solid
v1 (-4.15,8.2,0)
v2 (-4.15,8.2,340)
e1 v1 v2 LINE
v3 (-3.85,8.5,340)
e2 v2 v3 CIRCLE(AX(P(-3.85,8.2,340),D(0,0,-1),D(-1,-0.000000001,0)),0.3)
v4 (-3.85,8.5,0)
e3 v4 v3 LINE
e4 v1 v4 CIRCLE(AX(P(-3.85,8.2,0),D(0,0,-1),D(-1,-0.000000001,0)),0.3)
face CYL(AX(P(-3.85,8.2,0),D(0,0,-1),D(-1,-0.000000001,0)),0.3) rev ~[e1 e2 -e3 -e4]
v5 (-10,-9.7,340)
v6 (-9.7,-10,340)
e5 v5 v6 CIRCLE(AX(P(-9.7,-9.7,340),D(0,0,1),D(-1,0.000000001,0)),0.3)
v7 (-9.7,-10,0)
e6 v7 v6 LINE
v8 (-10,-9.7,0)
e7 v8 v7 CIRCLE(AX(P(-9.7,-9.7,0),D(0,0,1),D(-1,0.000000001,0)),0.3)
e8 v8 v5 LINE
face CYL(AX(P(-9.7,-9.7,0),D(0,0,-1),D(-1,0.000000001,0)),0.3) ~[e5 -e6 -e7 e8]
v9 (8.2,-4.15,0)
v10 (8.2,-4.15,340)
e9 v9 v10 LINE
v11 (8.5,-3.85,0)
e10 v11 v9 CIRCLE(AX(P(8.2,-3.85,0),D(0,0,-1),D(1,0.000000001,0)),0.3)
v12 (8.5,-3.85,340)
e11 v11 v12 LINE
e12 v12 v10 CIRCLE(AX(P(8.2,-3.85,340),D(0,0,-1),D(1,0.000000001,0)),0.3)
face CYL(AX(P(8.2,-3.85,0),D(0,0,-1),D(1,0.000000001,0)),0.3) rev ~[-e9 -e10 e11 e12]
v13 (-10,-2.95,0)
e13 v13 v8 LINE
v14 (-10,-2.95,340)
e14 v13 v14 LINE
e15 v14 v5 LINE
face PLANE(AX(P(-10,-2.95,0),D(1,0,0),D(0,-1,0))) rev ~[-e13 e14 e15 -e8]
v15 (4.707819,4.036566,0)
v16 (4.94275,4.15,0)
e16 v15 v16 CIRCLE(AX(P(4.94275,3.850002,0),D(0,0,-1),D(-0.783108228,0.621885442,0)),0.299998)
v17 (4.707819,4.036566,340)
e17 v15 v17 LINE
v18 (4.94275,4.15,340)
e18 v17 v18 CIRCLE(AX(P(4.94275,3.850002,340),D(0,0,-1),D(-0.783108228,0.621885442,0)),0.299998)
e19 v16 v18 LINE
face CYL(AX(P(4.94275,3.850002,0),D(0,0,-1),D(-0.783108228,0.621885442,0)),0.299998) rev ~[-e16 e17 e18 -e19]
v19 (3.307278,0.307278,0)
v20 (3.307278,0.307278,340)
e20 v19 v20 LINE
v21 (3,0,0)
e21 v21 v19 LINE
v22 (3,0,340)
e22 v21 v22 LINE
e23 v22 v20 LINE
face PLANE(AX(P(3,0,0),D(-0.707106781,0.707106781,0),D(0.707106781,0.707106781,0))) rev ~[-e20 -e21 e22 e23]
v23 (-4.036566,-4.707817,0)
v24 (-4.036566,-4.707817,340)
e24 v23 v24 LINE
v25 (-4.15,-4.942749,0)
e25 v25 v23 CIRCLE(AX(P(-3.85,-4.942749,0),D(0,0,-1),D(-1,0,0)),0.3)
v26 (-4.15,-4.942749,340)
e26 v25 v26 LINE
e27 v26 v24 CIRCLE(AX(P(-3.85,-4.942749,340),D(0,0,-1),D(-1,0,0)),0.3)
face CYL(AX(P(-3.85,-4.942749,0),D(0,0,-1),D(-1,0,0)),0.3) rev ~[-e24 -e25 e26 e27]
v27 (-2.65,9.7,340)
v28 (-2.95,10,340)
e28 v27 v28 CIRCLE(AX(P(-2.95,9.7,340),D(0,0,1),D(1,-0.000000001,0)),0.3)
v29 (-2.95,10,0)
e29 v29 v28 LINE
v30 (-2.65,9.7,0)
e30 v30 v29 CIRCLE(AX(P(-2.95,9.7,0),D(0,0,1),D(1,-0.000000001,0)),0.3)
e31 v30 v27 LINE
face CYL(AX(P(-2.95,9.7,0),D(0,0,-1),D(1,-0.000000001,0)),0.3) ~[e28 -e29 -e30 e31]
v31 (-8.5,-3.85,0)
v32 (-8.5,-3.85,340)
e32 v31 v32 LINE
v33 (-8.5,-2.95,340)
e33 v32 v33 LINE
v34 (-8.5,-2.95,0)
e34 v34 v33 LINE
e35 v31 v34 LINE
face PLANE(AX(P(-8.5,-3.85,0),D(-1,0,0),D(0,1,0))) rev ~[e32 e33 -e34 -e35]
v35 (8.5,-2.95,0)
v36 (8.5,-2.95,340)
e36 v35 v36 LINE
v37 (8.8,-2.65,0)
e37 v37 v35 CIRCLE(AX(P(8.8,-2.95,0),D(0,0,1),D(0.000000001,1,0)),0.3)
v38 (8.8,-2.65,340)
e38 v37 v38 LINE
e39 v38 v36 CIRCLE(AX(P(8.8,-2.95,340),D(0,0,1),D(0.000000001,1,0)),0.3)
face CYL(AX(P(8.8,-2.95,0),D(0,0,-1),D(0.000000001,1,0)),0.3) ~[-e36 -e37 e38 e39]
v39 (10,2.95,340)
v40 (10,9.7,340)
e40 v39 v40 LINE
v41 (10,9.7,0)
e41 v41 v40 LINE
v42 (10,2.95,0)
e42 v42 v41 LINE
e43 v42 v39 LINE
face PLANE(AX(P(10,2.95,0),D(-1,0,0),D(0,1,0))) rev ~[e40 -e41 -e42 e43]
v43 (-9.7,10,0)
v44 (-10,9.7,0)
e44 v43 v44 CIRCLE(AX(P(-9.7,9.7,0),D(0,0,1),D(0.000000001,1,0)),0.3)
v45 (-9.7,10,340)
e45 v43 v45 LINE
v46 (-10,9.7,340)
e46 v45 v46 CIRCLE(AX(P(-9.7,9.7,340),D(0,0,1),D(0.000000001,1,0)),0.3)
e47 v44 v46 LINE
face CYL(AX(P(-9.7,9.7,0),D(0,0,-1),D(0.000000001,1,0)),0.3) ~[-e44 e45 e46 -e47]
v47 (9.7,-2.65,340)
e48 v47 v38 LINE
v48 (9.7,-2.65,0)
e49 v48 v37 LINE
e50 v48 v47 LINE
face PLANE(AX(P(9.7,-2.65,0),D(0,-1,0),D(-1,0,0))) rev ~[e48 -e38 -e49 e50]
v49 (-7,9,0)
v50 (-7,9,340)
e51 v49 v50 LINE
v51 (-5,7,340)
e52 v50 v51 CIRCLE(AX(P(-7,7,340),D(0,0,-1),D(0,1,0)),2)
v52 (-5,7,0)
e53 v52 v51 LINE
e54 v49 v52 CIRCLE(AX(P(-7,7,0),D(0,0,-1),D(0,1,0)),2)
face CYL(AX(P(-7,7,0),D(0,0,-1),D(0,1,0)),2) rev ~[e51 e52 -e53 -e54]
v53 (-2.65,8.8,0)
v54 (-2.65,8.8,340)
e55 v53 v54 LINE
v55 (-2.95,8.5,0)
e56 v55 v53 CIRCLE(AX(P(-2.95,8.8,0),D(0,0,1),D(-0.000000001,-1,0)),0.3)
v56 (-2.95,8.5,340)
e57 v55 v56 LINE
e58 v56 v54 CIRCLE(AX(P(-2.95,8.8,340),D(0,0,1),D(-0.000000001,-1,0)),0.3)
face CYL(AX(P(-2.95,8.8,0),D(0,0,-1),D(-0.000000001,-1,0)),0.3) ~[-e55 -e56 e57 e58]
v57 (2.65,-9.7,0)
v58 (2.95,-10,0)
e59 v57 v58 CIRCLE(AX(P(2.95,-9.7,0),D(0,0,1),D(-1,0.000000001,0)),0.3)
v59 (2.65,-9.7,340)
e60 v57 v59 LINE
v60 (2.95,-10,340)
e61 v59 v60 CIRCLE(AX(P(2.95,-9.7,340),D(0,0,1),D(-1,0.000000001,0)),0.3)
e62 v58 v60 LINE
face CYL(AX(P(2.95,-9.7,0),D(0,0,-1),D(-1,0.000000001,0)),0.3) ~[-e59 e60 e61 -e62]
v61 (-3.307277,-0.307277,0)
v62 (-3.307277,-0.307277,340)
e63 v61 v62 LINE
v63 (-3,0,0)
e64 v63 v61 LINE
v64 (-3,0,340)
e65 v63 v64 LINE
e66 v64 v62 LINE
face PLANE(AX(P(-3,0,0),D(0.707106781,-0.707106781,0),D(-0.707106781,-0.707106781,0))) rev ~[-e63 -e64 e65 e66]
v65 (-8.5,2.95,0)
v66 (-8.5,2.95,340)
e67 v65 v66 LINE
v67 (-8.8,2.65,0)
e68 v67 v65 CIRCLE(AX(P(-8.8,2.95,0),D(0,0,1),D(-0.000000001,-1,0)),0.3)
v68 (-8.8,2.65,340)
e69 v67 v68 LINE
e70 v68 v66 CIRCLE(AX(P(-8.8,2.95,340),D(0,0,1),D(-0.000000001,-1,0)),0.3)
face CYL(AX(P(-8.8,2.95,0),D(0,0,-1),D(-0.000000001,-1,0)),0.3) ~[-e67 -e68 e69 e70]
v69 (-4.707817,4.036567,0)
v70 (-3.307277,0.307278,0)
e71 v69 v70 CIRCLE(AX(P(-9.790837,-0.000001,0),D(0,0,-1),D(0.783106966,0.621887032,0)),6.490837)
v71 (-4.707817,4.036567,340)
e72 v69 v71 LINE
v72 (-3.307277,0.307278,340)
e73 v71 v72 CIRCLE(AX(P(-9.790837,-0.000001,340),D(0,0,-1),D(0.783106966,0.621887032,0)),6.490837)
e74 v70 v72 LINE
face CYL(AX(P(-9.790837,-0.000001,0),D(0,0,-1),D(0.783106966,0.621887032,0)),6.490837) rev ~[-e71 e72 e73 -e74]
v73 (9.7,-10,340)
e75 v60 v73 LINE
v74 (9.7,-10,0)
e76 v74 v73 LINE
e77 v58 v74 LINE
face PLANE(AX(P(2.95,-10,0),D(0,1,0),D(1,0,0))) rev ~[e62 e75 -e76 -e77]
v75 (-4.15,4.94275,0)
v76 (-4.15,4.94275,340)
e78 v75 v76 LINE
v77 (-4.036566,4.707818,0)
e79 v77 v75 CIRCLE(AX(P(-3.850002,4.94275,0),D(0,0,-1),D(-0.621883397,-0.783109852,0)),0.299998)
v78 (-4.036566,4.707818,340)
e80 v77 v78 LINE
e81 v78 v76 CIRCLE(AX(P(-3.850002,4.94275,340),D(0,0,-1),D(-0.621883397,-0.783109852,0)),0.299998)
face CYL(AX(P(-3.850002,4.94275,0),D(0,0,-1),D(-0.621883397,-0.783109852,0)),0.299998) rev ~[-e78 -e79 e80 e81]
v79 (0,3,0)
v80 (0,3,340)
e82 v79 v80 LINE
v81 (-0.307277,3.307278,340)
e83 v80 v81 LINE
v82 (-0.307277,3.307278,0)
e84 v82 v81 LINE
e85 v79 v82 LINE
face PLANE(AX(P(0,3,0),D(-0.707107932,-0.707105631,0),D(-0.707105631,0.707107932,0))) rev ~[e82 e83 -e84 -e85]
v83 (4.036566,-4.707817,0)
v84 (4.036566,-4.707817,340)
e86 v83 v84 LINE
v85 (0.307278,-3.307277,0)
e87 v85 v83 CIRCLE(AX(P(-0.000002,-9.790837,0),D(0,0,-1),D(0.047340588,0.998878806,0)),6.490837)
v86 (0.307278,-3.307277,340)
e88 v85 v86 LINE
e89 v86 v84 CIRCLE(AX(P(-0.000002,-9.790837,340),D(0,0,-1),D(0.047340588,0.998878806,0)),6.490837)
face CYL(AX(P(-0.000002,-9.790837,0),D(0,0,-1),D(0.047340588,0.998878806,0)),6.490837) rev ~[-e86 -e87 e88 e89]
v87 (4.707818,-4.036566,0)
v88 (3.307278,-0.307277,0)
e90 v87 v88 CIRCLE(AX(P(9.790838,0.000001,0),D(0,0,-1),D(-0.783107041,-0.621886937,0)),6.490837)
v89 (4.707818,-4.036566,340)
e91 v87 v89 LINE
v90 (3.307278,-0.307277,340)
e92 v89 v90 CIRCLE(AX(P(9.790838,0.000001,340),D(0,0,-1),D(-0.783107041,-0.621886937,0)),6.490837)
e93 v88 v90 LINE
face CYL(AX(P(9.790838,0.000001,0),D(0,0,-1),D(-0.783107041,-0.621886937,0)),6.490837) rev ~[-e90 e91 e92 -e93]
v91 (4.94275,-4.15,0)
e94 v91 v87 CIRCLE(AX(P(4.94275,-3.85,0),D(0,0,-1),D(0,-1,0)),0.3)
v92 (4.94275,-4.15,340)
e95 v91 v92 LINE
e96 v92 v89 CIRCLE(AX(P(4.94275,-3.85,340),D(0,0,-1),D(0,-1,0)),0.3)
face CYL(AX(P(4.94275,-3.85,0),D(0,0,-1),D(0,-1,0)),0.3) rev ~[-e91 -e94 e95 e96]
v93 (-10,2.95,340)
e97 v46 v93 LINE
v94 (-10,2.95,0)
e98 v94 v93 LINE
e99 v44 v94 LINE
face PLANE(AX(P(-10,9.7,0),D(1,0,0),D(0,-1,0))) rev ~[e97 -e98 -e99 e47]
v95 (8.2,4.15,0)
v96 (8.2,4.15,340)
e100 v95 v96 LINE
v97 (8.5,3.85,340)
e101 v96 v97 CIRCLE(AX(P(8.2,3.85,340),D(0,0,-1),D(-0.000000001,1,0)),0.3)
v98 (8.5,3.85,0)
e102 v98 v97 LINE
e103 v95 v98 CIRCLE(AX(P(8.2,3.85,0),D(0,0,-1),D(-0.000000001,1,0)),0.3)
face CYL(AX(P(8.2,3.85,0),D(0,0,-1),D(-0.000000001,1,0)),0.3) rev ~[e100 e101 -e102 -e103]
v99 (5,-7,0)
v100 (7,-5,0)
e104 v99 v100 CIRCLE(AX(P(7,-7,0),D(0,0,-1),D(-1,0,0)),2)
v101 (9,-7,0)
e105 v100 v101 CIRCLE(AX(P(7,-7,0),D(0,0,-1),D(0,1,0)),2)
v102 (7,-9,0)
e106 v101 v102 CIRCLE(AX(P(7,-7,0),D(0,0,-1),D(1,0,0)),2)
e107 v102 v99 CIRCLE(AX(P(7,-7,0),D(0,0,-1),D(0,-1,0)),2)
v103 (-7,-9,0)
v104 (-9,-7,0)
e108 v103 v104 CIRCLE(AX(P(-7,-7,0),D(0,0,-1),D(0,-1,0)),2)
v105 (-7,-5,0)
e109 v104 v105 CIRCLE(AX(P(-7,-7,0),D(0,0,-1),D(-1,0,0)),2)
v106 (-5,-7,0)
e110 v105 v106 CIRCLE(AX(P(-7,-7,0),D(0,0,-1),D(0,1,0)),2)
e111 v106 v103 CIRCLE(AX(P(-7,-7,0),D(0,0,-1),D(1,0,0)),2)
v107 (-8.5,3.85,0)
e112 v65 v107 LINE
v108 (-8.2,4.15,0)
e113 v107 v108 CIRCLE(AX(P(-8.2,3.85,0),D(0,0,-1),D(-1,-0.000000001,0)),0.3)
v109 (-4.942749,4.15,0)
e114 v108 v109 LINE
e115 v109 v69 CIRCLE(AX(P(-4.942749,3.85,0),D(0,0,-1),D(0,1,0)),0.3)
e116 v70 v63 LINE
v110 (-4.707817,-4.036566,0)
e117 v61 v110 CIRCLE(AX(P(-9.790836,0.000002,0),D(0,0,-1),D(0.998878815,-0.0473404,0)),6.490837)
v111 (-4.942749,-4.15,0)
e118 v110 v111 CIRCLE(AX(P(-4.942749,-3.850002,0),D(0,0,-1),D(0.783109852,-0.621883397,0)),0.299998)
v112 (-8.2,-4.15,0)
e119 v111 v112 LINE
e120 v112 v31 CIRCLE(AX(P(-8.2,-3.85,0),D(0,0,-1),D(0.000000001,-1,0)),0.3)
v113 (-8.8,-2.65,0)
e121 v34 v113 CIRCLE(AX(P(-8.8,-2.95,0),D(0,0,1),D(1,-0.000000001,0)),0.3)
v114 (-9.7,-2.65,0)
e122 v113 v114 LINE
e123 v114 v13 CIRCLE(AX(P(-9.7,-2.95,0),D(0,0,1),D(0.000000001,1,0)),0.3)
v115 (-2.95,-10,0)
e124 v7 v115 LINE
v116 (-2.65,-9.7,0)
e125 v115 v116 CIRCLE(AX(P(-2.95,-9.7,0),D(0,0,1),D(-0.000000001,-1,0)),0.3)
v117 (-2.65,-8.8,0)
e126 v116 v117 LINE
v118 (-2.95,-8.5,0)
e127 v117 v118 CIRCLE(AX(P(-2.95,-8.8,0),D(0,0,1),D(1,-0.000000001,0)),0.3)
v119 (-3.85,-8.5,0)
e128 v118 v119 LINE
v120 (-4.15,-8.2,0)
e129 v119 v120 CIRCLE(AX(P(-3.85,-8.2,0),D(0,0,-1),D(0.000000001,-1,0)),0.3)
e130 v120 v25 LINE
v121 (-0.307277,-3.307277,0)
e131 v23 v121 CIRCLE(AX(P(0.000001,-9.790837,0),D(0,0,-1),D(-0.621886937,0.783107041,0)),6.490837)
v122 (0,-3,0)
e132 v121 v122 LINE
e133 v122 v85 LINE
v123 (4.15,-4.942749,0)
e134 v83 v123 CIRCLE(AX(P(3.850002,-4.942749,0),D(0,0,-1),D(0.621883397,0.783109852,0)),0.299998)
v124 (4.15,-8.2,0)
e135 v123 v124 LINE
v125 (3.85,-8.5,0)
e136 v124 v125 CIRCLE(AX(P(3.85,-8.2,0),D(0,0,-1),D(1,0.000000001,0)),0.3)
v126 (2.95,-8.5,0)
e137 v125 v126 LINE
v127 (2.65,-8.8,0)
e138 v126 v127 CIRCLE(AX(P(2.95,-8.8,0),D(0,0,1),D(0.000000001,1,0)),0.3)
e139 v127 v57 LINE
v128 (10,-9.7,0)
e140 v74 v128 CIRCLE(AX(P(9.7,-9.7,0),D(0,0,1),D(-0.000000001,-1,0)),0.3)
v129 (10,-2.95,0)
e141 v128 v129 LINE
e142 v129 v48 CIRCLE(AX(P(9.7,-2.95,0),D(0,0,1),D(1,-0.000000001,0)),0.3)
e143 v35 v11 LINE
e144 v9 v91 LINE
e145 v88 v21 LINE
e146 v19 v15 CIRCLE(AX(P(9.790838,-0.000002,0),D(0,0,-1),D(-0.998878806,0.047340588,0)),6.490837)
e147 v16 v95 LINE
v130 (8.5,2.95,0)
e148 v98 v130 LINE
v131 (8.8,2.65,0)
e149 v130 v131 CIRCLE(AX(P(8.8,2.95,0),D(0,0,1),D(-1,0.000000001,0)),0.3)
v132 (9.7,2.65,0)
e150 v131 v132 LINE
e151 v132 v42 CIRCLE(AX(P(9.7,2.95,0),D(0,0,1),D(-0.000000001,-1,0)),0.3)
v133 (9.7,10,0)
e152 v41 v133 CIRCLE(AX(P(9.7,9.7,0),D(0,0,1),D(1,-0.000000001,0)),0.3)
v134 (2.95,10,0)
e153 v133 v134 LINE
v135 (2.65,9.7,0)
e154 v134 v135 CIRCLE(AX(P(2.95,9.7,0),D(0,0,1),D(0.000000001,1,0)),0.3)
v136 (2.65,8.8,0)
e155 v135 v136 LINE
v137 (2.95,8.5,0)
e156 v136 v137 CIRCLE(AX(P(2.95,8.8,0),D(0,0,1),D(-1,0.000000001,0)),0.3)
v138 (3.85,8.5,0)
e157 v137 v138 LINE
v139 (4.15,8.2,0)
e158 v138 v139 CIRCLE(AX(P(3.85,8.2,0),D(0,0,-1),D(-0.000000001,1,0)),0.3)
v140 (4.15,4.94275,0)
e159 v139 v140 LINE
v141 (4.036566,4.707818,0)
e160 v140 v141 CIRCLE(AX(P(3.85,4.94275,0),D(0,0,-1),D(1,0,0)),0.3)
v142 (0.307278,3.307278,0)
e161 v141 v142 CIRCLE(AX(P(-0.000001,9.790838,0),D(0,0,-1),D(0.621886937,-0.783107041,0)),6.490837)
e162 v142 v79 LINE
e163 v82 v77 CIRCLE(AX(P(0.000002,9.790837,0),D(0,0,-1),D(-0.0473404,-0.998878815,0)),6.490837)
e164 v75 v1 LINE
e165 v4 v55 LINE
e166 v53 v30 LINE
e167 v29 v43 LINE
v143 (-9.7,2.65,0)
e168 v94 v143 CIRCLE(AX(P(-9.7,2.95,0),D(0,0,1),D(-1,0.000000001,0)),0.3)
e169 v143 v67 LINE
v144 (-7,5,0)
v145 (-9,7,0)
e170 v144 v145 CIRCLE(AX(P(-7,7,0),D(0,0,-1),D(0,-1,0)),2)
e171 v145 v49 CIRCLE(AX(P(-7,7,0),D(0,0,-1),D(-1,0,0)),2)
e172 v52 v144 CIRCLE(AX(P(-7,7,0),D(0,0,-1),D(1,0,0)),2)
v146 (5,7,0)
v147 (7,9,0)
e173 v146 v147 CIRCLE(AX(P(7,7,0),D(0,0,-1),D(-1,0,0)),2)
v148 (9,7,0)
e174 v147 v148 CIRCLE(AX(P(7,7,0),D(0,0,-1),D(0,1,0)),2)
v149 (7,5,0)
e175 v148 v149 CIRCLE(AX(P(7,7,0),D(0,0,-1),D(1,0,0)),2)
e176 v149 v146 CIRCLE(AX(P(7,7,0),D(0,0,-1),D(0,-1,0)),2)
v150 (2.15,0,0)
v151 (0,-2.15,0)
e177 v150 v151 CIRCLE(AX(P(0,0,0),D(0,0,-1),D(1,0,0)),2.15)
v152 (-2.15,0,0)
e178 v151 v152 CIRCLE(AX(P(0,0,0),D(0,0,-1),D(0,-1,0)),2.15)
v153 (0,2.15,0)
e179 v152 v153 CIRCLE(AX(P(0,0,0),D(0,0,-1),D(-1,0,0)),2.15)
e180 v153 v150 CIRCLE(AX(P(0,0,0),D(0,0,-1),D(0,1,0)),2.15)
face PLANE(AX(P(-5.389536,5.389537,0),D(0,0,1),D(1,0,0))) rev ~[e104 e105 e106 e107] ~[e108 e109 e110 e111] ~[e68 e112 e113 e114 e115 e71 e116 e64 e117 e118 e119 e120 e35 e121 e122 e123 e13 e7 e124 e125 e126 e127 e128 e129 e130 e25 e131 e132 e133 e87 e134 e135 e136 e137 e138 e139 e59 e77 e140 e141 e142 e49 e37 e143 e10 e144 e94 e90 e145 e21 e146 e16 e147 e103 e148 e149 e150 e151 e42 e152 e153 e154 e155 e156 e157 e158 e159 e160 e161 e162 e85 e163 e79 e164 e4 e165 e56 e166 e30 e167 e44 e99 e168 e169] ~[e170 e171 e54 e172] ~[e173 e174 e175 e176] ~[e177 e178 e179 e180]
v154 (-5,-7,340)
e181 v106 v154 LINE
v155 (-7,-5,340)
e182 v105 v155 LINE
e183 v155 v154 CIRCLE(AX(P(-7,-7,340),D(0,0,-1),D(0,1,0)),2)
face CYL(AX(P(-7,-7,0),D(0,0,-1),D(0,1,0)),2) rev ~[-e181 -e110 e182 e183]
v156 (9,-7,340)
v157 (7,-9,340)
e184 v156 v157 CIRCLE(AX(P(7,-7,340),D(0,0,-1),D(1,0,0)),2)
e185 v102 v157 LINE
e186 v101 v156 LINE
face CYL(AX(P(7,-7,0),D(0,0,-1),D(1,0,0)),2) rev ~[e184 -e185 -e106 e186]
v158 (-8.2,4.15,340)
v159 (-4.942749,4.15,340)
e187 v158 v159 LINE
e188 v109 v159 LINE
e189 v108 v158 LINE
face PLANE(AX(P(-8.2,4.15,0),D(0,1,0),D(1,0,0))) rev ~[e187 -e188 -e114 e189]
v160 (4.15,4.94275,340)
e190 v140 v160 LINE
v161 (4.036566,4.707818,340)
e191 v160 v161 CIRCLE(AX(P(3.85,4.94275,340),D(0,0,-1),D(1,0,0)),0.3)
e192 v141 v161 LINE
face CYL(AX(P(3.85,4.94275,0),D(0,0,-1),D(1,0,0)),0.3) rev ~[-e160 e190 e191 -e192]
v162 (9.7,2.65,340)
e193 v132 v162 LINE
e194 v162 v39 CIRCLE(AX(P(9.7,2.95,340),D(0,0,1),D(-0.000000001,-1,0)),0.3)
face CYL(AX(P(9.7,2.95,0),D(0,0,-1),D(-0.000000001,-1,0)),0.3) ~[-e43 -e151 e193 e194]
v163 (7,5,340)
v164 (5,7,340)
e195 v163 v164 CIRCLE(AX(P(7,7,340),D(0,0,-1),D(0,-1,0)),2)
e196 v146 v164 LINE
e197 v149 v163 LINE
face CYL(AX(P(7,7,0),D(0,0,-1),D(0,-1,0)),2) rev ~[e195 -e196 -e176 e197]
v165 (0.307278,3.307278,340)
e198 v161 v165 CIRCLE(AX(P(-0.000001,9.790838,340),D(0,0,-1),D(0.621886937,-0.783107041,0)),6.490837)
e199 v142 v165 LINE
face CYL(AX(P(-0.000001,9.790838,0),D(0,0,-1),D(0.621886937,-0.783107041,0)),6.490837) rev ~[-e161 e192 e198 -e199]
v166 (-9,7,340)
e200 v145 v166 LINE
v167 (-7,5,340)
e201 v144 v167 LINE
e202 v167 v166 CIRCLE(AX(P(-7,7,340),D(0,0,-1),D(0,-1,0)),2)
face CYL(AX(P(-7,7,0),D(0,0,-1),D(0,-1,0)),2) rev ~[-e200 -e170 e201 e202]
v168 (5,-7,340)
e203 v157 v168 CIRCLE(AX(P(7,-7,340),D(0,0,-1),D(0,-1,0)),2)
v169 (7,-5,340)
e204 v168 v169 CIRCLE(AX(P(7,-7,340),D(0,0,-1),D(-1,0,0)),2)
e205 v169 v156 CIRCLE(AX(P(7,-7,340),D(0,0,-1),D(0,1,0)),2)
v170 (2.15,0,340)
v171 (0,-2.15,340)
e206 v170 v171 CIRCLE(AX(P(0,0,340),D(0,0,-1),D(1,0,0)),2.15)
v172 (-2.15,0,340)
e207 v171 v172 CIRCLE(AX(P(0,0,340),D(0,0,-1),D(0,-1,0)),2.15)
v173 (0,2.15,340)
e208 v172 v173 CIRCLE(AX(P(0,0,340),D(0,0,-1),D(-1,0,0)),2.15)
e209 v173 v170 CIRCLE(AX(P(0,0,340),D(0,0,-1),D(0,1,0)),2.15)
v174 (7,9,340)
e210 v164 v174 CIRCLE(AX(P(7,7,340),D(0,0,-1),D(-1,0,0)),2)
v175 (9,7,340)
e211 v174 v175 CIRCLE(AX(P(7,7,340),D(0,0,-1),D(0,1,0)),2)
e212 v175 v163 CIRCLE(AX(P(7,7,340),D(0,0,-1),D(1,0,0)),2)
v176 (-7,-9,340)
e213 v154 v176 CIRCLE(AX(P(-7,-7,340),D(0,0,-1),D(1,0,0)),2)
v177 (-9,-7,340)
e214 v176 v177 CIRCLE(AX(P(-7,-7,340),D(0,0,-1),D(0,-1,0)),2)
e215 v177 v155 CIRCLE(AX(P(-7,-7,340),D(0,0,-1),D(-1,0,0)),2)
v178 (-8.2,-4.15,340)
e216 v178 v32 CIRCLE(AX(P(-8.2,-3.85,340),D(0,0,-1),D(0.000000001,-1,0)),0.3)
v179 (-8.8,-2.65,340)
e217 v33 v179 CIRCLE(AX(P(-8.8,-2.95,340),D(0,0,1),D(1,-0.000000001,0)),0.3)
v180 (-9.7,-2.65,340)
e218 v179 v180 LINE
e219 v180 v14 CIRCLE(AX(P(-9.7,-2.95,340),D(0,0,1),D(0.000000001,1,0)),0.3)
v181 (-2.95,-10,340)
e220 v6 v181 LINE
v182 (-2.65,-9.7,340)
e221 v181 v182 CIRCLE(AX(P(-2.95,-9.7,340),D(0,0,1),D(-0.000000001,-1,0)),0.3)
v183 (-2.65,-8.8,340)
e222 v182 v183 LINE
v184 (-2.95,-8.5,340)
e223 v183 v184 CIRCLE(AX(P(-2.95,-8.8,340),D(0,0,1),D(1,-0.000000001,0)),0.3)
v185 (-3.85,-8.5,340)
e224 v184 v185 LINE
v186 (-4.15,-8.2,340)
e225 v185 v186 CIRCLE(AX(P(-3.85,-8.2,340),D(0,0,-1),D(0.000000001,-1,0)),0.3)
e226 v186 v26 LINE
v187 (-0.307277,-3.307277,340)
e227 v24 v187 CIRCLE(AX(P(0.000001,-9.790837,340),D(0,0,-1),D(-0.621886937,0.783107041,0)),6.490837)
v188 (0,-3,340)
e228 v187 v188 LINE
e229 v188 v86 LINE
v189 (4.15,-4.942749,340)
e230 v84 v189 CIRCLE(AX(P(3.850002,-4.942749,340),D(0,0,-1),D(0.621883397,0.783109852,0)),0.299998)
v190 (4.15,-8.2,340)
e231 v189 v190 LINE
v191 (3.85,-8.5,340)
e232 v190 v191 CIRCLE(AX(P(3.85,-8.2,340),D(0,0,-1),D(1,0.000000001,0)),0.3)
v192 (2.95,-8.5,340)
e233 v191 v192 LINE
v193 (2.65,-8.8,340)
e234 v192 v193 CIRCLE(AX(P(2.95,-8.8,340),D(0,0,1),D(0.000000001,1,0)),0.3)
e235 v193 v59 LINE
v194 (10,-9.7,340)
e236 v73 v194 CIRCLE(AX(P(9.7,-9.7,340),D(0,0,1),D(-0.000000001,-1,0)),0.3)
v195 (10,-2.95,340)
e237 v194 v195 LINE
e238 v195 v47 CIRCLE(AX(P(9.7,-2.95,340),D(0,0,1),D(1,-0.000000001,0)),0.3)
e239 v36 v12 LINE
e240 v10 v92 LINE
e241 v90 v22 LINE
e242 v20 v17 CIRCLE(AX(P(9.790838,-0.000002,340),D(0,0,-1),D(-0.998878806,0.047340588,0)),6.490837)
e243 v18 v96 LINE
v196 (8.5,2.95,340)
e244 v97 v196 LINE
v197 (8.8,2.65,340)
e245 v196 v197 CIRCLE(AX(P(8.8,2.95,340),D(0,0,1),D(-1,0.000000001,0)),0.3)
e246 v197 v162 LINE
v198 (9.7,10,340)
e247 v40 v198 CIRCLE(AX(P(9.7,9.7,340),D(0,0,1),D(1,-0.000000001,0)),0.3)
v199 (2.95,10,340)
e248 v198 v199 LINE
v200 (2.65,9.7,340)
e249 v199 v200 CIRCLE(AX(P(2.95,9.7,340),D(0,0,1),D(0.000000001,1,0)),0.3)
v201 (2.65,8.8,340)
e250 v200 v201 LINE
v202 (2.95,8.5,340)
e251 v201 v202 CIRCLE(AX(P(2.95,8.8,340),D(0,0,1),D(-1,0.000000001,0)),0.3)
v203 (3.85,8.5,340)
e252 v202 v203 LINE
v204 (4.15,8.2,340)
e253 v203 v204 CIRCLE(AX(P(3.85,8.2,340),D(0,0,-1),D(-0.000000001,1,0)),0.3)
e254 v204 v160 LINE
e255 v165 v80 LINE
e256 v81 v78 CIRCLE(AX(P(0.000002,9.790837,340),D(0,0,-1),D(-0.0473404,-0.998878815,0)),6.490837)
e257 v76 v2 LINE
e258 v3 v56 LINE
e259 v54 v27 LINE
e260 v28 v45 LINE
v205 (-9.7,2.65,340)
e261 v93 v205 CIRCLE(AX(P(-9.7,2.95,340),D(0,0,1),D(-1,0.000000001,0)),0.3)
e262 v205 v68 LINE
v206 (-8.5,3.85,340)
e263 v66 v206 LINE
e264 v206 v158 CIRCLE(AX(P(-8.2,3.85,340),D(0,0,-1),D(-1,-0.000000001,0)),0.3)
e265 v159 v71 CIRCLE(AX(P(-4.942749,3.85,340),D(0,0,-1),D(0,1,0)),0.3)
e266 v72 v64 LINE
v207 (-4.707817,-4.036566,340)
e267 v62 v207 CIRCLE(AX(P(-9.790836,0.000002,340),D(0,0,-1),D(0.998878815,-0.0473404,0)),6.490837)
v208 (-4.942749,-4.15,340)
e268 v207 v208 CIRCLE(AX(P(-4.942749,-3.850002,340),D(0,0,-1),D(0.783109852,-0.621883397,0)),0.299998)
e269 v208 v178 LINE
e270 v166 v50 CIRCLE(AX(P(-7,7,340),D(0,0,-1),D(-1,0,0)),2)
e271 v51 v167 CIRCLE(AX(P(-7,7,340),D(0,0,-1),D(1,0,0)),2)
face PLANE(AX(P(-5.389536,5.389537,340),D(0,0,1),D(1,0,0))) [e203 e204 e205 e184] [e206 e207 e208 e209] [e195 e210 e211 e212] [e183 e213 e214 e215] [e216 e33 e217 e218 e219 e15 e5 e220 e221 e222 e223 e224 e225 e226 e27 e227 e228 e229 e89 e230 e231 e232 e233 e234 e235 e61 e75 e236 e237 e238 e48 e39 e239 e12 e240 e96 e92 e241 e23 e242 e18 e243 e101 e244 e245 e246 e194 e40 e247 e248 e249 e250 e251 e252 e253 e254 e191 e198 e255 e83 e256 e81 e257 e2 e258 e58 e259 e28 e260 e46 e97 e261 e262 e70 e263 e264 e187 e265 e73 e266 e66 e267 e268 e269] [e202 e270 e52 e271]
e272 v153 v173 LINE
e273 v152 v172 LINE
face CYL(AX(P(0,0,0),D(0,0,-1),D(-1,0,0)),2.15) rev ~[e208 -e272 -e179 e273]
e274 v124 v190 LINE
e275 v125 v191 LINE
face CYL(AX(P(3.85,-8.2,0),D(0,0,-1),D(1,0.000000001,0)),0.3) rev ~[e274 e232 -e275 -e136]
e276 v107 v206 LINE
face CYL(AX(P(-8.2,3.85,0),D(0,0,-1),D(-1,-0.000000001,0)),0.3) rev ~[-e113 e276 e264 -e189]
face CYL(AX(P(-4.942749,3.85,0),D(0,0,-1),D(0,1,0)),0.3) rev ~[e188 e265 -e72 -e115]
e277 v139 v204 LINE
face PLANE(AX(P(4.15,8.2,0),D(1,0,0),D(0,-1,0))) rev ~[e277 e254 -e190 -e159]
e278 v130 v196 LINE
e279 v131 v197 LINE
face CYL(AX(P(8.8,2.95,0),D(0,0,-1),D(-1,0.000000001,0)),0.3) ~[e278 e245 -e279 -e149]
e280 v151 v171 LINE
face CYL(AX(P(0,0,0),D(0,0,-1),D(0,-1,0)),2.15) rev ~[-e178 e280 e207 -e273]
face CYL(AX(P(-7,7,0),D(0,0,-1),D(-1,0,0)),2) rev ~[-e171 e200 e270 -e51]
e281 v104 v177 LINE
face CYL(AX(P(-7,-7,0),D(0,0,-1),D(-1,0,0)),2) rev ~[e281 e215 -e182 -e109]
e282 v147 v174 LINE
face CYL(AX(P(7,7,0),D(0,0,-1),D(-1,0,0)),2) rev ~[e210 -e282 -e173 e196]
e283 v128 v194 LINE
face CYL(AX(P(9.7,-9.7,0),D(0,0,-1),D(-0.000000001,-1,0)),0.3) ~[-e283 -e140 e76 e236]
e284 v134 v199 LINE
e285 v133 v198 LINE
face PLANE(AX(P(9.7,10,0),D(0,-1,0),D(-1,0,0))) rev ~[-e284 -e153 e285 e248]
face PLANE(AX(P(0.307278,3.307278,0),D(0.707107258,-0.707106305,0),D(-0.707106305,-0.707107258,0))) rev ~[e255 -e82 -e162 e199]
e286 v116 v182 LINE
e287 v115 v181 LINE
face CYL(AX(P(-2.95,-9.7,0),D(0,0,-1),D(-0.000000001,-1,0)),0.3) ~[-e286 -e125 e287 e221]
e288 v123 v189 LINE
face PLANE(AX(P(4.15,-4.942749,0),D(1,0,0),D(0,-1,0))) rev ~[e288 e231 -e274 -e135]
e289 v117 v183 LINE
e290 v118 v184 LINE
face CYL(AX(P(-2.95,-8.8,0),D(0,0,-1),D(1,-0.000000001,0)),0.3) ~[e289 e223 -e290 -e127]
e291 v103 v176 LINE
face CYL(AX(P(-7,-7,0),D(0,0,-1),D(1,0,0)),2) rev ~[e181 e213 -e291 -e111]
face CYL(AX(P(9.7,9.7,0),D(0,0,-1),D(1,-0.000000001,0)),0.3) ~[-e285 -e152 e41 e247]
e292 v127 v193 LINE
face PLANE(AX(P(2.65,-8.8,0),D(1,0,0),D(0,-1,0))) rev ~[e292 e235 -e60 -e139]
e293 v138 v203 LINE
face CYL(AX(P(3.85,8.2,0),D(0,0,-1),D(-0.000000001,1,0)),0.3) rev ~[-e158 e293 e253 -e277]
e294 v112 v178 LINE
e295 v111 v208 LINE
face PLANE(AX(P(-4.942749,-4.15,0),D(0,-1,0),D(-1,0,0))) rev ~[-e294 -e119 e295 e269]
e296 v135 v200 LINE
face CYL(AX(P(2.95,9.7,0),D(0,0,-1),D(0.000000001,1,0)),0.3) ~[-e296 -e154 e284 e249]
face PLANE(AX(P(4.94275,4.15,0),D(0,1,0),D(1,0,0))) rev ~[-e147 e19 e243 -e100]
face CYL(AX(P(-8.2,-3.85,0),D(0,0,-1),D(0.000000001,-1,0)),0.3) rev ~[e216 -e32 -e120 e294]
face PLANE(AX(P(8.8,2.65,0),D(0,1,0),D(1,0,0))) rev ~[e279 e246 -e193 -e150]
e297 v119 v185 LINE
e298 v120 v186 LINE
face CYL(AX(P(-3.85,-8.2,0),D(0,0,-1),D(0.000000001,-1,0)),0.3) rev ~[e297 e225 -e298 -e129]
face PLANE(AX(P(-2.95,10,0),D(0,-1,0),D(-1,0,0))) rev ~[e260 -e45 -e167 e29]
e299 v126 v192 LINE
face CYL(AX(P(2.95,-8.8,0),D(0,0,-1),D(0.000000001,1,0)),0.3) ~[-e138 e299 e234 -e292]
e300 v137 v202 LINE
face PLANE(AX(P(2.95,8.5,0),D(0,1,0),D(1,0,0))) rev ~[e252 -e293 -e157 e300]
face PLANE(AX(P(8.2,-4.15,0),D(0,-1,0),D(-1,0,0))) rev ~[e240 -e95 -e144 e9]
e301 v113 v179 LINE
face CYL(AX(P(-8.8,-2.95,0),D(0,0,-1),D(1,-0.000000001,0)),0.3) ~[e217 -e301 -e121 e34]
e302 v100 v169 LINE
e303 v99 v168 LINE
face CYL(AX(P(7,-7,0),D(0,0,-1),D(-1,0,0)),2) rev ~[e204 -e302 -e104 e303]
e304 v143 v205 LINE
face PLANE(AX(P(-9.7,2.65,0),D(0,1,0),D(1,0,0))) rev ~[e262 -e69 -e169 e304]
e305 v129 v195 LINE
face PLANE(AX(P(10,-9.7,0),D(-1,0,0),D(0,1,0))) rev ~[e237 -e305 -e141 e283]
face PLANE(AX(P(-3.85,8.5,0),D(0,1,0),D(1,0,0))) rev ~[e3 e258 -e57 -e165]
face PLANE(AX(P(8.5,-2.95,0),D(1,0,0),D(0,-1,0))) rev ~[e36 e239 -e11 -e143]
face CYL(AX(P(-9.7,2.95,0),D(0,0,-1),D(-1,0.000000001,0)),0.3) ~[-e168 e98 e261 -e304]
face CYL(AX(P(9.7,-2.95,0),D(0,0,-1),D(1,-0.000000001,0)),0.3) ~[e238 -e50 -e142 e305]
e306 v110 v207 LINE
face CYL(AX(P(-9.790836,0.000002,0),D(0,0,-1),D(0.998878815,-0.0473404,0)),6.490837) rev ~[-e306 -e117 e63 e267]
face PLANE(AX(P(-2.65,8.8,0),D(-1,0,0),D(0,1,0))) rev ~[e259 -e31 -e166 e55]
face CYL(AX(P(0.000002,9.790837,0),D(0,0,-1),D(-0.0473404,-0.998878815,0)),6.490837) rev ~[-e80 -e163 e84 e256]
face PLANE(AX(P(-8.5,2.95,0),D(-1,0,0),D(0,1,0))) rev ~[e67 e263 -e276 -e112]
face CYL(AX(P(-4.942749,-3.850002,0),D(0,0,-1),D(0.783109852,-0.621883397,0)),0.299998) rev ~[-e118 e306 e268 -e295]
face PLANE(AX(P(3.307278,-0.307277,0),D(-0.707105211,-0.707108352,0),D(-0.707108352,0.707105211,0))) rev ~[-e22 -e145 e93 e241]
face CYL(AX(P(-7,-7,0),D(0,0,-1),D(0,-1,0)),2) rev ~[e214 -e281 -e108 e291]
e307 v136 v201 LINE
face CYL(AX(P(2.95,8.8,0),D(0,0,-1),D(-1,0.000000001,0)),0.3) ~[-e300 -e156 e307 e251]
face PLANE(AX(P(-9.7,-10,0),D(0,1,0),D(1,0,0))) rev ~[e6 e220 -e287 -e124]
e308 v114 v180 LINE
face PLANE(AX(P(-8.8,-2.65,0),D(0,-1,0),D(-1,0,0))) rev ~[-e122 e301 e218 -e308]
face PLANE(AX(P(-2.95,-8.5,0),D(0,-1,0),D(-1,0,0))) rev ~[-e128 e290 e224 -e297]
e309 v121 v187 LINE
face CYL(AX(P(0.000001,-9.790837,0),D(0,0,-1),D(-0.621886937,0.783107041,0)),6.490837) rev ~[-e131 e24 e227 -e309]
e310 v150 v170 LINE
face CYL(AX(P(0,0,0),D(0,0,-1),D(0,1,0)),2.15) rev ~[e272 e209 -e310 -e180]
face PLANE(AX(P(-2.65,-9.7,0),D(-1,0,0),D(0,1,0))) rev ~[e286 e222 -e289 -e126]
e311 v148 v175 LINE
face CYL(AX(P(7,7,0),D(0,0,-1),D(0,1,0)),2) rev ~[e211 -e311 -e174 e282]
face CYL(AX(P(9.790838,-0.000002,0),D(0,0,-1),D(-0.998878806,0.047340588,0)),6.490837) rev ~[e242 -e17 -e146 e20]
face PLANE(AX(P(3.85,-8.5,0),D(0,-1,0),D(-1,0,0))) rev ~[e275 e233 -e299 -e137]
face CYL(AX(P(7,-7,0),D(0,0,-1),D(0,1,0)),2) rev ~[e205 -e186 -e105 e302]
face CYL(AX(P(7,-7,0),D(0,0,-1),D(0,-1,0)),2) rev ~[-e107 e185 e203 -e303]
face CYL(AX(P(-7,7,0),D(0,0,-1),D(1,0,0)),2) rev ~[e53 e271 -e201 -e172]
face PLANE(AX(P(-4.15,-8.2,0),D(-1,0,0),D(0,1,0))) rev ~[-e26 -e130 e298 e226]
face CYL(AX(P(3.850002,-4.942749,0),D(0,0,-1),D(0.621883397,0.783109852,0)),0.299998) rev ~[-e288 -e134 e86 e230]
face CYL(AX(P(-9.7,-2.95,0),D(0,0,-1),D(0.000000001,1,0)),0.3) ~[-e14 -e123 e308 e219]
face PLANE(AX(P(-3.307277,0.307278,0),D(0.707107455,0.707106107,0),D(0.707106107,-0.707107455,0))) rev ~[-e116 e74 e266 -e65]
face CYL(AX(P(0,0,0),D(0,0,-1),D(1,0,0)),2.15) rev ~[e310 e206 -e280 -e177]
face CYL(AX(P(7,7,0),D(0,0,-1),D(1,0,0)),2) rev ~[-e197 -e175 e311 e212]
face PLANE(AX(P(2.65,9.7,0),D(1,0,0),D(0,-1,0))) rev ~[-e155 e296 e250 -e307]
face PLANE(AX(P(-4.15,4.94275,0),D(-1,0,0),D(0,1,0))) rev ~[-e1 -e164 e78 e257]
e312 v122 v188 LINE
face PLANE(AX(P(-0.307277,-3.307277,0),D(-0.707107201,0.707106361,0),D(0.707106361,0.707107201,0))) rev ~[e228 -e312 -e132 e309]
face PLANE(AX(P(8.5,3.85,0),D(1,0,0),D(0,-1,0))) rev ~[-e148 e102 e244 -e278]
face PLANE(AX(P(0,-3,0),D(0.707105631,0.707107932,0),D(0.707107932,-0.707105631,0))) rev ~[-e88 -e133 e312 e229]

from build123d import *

# Parameters (mm, degrees)
F1_DEPTH = 340


# Not quite as in the source:
# - ends of sketch curves that miss each other by under 0.0002 mm in the source are joined


with BuildPart() as f1:
    # F0 (on Top) → F1 (new body)
    with BuildSketch(Plane.XY):
        with BuildLine():
            ThreePointArc((-2.15, 0), (-1.5202795796, 1.5202795796), (0, 2.15))
            Line((0, 2.15), (0, 3))
            Line((0, 3), (-0.307277, 3.307278))
            ThreePointArc((-0.307277, 3.307278), (-2.2820211583, 3.7143800615), (-4.036565823, 4.7078182229))
            ThreePointArc((-4.036565823, 4.7078182229), (-4.1201572004, 4.8123081084), (-4.15, 4.94275))
            Line((-4.15, 4.94275), (-4.15, 8.2))
            ThreePointArc((-4.15, 8.2), (-4.0621320344, 8.4121320344), (-3.85, 8.5))
            Line((-3.85, 8.5), (-2.95, 8.5))
            ThreePointArc((-2.95, 8.5), (-2.7378679656, 8.5878679656), (-2.65, 8.8))
            Line((-2.65, 8.8), (-2.65, 9.7))
            ThreePointArc((-2.65, 9.7), (-2.7378679656, 9.9121320344), (-2.95, 10))
            Line((-2.95, 10), (-9.7, 10))
            ThreePointArc((-9.7, 10), (-9.9121320344, 9.9121320344), (-10, 9.7))
            Line((-10, 9.7), (-10, 2.95))
            ThreePointArc((-10, 2.95), (-9.9121320344, 2.7378679656), (-9.7, 2.65))
            Line((-9.7, 2.65), (-8.8, 2.65))
            ThreePointArc((-8.8, 2.65), (-8.5878679656, 2.7378679656), (-8.5, 2.95))
            Line((-8.5, 2.95), (-8.5, 3.85))
            ThreePointArc((-8.5, 3.85), (-8.4121320344, 4.0621320344), (-8.2, 4.15))
            Line((-8.2, 4.15), (-4.942749, 4.15))
            ThreePointArc((-4.942749, 4.15), (-4.812307461, 4.1201573706), (-4.7078173786, 4.0365666993))
            ThreePointArc((-4.7078173786, 4.0365666993), (-3.7143793747, 2.2820219924), (-3.3072773955, 0.3072779813))
            Line((-3.3072773955, 0.3072779813), (-3, 0))
            Line((-3, 0), (-2.15, 0))
        make_face()
        with BuildLine():
            ThreePointArc((-7, 5), (-8.4142135624, 5.5857864376), (-9, 7))
            ThreePointArc((-9, 7), (-8.4142135624, 8.4142135624), (-7, 9))
            ThreePointArc((-7, 9), (-5.5857864376, 8.4142135624), (-5, 7))
            ThreePointArc((-5, 7), (-5.5857864376, 5.5857864376), (-7, 5))
        make_face(mode=Mode.SUBTRACT)
        with BuildLine():
            ThreePointArc((0, 2.15), (1.5202795796, 1.5202795796), (2.15, 0))
            Line((2.15, 0), (3, 0))
            Line((3, 0), (3.307278, 0.307278))
            ThreePointArc((3.307278, 0.307278), (3.7143803747, 2.2820219924), (4.7078187099, 4.0365664363))
            ThreePointArc((4.7078187099, 4.0365664363), (4.812308461, 4.1201573706), (4.94275, 4.15))
            Line((4.94275, 4.15), (8.2, 4.15))
            ThreePointArc((8.2, 4.15), (8.4121320344, 4.0621320344), (8.5, 3.85))
            Line((8.5, 3.85), (8.5, 2.95))
            ThreePointArc((8.5, 2.95), (8.5878679656, 2.7378679656), (8.8, 2.65))
            Line((8.8, 2.65), (9.7, 2.65))
            ThreePointArc((9.7, 2.65), (9.9121320344, 2.7378679656), (10, 2.95))
            Line((10, 2.95), (10, 9.7))
            ThreePointArc((10, 9.7), (9.9121320344, 9.9121320344), (9.7, 10))
            Line((9.7, 10), (2.95, 10))
            ThreePointArc((2.95, 10), (2.7378679656, 9.9121320344), (2.65, 9.7))
            Line((2.65, 9.7), (2.65, 8.8))
            ThreePointArc((2.65, 8.8), (2.7378679656, 8.5878679656), (2.95, 8.5))
            Line((2.95, 8.5), (3.85, 8.5))
            ThreePointArc((3.85, 8.5), (4.0621320344, 8.4121320344), (4.15, 8.2))
            Line((4.15, 8.2), (4.15, 4.94275))
            ThreePointArc((4.15, 4.94275), (4.1201572004, 4.8123081084), (4.036566086, 4.7078178916))
            ThreePointArc((4.036566086, 4.7078178916), (2.2820216259, 3.7143802371), (0.3072779813, 3.3072783955))
            Line((0.3072779813, 3.3072783955), (0, 3))
            Line((0, 3), (0, 2.15))
        make_face()
        with BuildLine():
            ThreePointArc((7, 9), (8.4142135624, 8.4142135624), (9, 7))
            ThreePointArc((9, 7), (8.4142135624, 5.5857864376), (7, 5))
            ThreePointArc((7, 5), (5.5857864376, 5.5857864376), (5, 7))
            ThreePointArc((5, 7), (5.5857864376, 8.4142135624), (7, 9))
        make_face(mode=Mode.SUBTRACT)
        with BuildLine():
            Line((3, 0), (2.15, 0))
            ThreePointArc((2.15, 0), (1.5202795796, -1.5202795796), (0, -2.15))
            Line((0, -2.15), (0, -3))
            Line((0, -3), (0.307278, -3.307277))
            ThreePointArc((0.307278, -3.307277), (2.2820216259, -3.7143792371), (4.036565823, -4.7078172229))
            ThreePointArc((4.036565823, -4.7078172229), (4.1201572004, -4.8123071084), (4.15, -4.942749))
            Line((4.15, -4.942749), (4.15, -8.2))
            ThreePointArc((4.15, -8.2), (4.0621320344, -8.4121320344), (3.85, -8.5))
            Line((3.85, -8.5), (2.95, -8.5))
            ThreePointArc((2.95, -8.5), (2.7378679656, -8.5878679656), (2.65, -8.8))
            Line((2.65, -8.8), (2.65, -9.7))
            ThreePointArc((2.65, -9.7), (2.7378679656, -9.9121320344), (2.95, -10))
            Line((2.95, -10), (9.7, -10))
            ThreePointArc((9.7, -10), (9.9121320344, -9.9121320344), (10, -9.7))
            Line((10, -9.7), (10, -2.95))
            ThreePointArc((10, -2.95), (9.9121320344, -2.7378679656), (9.7, -2.65))
            Line((9.7, -2.65), (8.8, -2.65))
            ThreePointArc((8.8, -2.65), (8.5878679656, -2.7378679656), (8.5, -2.95))
            Line((8.5, -2.95), (8.5, -3.85))
            ThreePointArc((8.5, -3.85), (8.4121320344, -4.0621320344), (8.2, -4.15))
            Line((8.2, -4.15), (4.94275, -4.15))
            ThreePointArc((4.94275, -4.15), (4.8123081084, -4.1201572004), (4.7078178916, -4.036566086))
            ThreePointArc((4.7078178916, -4.036566086), (3.7143800615, -2.2820211583), (3.3072783483, -0.3072769835))
            Line((3.3072783483, -0.3072769835), (3, 0))
        make_face()
        with BuildLine():
            ThreePointArc((7, -5), (8.4142135624, -5.5857864376), (9, -7))
            ThreePointArc((9, -7), (8.4142135624, -8.4142135624), (7, -9))
            ThreePointArc((7, -9), (5.5857864376, -8.4142135624), (5, -7))
            ThreePointArc((5, -7), (5.5857864376, -5.5857864376), (7, -5))
        make_face(mode=Mode.SUBTRACT)
        with BuildLine():
            Line((0, -3), (0, -2.15))
            ThreePointArc((0, -2.15), (-1.5202795796, -1.5202795796), (-2.15, 0))
            Line((-2.15, 0), (-3, 0))
            Line((-3, 0), (-3.307277, -0.307277))
            ThreePointArc((-3.307277, -0.307277), (-3.7143790615, -2.2820211583), (-4.7078172229, -4.036565823))
            ThreePointArc((-4.7078172229, -4.036565823), (-4.8123071084, -4.1201572004), (-4.942749, -4.15))
            Line((-4.942749, -4.15), (-8.2, -4.15))
            ThreePointArc((-8.2, -4.15), (-8.4121320344, -4.0621320344), (-8.5, -3.85))
            Line((-8.5, -3.85), (-8.5, -2.95))
            ThreePointArc((-8.5, -2.95), (-8.5878679656, -2.7378679656), (-8.8, -2.65))
            Line((-8.8, -2.65), (-9.7, -2.65))
            ThreePointArc((-9.7, -2.65), (-9.9121320344, -2.7378679656), (-10, -2.95))
            Line((-10, -2.95), (-10, -9.7))
            ThreePointArc((-10, -9.7), (-9.9121320344, -9.9121320344), (-9.7, -10))
            Line((-9.7, -10), (-2.95, -10))
            ThreePointArc((-2.95, -10), (-2.7378679656, -9.9121320344), (-2.65, -9.7))
            Line((-2.65, -9.7), (-2.65, -8.8))
            ThreePointArc((-2.65, -8.8), (-2.7378679656, -8.5878679656), (-2.95, -8.5))
            Line((-2.95, -8.5), (-3.85, -8.5))
            ThreePointArc((-3.85, -8.5), (-4.0621320344, -8.4121320344), (-4.15, -8.2))
            Line((-4.15, -8.2), (-4.15, -4.942749))
            ThreePointArc((-4.15, -4.942749), (-4.1201572004, -4.8123071084), (-4.036566086, -4.7078168916))
            ThreePointArc((-4.036566086, -4.7078168916), (-2.2820211583, -3.7143790615), (-0.3072769835, -3.3072773483))
            Line((-0.3072769835, -3.3072773483), (0, -3))
        make_face()
        with BuildLine():
            ThreePointArc((-7, -9), (-8.4142135624, -8.4142135624), (-9, -7))
            ThreePointArc((-9, -7), (-8.4142135624, -5.5857864376), (-7, -5))
            ThreePointArc((-7, -5), (-5.5857864376, -5.5857864376), (-5, -7))
            ThreePointArc((-5, -7), (-5.5857864376, -8.4142135624), (-7, -9))
        make_face(mode=Mode.SUBTRACT)
    extrude(amount=F1_DEPTH)


solid = f1.part
